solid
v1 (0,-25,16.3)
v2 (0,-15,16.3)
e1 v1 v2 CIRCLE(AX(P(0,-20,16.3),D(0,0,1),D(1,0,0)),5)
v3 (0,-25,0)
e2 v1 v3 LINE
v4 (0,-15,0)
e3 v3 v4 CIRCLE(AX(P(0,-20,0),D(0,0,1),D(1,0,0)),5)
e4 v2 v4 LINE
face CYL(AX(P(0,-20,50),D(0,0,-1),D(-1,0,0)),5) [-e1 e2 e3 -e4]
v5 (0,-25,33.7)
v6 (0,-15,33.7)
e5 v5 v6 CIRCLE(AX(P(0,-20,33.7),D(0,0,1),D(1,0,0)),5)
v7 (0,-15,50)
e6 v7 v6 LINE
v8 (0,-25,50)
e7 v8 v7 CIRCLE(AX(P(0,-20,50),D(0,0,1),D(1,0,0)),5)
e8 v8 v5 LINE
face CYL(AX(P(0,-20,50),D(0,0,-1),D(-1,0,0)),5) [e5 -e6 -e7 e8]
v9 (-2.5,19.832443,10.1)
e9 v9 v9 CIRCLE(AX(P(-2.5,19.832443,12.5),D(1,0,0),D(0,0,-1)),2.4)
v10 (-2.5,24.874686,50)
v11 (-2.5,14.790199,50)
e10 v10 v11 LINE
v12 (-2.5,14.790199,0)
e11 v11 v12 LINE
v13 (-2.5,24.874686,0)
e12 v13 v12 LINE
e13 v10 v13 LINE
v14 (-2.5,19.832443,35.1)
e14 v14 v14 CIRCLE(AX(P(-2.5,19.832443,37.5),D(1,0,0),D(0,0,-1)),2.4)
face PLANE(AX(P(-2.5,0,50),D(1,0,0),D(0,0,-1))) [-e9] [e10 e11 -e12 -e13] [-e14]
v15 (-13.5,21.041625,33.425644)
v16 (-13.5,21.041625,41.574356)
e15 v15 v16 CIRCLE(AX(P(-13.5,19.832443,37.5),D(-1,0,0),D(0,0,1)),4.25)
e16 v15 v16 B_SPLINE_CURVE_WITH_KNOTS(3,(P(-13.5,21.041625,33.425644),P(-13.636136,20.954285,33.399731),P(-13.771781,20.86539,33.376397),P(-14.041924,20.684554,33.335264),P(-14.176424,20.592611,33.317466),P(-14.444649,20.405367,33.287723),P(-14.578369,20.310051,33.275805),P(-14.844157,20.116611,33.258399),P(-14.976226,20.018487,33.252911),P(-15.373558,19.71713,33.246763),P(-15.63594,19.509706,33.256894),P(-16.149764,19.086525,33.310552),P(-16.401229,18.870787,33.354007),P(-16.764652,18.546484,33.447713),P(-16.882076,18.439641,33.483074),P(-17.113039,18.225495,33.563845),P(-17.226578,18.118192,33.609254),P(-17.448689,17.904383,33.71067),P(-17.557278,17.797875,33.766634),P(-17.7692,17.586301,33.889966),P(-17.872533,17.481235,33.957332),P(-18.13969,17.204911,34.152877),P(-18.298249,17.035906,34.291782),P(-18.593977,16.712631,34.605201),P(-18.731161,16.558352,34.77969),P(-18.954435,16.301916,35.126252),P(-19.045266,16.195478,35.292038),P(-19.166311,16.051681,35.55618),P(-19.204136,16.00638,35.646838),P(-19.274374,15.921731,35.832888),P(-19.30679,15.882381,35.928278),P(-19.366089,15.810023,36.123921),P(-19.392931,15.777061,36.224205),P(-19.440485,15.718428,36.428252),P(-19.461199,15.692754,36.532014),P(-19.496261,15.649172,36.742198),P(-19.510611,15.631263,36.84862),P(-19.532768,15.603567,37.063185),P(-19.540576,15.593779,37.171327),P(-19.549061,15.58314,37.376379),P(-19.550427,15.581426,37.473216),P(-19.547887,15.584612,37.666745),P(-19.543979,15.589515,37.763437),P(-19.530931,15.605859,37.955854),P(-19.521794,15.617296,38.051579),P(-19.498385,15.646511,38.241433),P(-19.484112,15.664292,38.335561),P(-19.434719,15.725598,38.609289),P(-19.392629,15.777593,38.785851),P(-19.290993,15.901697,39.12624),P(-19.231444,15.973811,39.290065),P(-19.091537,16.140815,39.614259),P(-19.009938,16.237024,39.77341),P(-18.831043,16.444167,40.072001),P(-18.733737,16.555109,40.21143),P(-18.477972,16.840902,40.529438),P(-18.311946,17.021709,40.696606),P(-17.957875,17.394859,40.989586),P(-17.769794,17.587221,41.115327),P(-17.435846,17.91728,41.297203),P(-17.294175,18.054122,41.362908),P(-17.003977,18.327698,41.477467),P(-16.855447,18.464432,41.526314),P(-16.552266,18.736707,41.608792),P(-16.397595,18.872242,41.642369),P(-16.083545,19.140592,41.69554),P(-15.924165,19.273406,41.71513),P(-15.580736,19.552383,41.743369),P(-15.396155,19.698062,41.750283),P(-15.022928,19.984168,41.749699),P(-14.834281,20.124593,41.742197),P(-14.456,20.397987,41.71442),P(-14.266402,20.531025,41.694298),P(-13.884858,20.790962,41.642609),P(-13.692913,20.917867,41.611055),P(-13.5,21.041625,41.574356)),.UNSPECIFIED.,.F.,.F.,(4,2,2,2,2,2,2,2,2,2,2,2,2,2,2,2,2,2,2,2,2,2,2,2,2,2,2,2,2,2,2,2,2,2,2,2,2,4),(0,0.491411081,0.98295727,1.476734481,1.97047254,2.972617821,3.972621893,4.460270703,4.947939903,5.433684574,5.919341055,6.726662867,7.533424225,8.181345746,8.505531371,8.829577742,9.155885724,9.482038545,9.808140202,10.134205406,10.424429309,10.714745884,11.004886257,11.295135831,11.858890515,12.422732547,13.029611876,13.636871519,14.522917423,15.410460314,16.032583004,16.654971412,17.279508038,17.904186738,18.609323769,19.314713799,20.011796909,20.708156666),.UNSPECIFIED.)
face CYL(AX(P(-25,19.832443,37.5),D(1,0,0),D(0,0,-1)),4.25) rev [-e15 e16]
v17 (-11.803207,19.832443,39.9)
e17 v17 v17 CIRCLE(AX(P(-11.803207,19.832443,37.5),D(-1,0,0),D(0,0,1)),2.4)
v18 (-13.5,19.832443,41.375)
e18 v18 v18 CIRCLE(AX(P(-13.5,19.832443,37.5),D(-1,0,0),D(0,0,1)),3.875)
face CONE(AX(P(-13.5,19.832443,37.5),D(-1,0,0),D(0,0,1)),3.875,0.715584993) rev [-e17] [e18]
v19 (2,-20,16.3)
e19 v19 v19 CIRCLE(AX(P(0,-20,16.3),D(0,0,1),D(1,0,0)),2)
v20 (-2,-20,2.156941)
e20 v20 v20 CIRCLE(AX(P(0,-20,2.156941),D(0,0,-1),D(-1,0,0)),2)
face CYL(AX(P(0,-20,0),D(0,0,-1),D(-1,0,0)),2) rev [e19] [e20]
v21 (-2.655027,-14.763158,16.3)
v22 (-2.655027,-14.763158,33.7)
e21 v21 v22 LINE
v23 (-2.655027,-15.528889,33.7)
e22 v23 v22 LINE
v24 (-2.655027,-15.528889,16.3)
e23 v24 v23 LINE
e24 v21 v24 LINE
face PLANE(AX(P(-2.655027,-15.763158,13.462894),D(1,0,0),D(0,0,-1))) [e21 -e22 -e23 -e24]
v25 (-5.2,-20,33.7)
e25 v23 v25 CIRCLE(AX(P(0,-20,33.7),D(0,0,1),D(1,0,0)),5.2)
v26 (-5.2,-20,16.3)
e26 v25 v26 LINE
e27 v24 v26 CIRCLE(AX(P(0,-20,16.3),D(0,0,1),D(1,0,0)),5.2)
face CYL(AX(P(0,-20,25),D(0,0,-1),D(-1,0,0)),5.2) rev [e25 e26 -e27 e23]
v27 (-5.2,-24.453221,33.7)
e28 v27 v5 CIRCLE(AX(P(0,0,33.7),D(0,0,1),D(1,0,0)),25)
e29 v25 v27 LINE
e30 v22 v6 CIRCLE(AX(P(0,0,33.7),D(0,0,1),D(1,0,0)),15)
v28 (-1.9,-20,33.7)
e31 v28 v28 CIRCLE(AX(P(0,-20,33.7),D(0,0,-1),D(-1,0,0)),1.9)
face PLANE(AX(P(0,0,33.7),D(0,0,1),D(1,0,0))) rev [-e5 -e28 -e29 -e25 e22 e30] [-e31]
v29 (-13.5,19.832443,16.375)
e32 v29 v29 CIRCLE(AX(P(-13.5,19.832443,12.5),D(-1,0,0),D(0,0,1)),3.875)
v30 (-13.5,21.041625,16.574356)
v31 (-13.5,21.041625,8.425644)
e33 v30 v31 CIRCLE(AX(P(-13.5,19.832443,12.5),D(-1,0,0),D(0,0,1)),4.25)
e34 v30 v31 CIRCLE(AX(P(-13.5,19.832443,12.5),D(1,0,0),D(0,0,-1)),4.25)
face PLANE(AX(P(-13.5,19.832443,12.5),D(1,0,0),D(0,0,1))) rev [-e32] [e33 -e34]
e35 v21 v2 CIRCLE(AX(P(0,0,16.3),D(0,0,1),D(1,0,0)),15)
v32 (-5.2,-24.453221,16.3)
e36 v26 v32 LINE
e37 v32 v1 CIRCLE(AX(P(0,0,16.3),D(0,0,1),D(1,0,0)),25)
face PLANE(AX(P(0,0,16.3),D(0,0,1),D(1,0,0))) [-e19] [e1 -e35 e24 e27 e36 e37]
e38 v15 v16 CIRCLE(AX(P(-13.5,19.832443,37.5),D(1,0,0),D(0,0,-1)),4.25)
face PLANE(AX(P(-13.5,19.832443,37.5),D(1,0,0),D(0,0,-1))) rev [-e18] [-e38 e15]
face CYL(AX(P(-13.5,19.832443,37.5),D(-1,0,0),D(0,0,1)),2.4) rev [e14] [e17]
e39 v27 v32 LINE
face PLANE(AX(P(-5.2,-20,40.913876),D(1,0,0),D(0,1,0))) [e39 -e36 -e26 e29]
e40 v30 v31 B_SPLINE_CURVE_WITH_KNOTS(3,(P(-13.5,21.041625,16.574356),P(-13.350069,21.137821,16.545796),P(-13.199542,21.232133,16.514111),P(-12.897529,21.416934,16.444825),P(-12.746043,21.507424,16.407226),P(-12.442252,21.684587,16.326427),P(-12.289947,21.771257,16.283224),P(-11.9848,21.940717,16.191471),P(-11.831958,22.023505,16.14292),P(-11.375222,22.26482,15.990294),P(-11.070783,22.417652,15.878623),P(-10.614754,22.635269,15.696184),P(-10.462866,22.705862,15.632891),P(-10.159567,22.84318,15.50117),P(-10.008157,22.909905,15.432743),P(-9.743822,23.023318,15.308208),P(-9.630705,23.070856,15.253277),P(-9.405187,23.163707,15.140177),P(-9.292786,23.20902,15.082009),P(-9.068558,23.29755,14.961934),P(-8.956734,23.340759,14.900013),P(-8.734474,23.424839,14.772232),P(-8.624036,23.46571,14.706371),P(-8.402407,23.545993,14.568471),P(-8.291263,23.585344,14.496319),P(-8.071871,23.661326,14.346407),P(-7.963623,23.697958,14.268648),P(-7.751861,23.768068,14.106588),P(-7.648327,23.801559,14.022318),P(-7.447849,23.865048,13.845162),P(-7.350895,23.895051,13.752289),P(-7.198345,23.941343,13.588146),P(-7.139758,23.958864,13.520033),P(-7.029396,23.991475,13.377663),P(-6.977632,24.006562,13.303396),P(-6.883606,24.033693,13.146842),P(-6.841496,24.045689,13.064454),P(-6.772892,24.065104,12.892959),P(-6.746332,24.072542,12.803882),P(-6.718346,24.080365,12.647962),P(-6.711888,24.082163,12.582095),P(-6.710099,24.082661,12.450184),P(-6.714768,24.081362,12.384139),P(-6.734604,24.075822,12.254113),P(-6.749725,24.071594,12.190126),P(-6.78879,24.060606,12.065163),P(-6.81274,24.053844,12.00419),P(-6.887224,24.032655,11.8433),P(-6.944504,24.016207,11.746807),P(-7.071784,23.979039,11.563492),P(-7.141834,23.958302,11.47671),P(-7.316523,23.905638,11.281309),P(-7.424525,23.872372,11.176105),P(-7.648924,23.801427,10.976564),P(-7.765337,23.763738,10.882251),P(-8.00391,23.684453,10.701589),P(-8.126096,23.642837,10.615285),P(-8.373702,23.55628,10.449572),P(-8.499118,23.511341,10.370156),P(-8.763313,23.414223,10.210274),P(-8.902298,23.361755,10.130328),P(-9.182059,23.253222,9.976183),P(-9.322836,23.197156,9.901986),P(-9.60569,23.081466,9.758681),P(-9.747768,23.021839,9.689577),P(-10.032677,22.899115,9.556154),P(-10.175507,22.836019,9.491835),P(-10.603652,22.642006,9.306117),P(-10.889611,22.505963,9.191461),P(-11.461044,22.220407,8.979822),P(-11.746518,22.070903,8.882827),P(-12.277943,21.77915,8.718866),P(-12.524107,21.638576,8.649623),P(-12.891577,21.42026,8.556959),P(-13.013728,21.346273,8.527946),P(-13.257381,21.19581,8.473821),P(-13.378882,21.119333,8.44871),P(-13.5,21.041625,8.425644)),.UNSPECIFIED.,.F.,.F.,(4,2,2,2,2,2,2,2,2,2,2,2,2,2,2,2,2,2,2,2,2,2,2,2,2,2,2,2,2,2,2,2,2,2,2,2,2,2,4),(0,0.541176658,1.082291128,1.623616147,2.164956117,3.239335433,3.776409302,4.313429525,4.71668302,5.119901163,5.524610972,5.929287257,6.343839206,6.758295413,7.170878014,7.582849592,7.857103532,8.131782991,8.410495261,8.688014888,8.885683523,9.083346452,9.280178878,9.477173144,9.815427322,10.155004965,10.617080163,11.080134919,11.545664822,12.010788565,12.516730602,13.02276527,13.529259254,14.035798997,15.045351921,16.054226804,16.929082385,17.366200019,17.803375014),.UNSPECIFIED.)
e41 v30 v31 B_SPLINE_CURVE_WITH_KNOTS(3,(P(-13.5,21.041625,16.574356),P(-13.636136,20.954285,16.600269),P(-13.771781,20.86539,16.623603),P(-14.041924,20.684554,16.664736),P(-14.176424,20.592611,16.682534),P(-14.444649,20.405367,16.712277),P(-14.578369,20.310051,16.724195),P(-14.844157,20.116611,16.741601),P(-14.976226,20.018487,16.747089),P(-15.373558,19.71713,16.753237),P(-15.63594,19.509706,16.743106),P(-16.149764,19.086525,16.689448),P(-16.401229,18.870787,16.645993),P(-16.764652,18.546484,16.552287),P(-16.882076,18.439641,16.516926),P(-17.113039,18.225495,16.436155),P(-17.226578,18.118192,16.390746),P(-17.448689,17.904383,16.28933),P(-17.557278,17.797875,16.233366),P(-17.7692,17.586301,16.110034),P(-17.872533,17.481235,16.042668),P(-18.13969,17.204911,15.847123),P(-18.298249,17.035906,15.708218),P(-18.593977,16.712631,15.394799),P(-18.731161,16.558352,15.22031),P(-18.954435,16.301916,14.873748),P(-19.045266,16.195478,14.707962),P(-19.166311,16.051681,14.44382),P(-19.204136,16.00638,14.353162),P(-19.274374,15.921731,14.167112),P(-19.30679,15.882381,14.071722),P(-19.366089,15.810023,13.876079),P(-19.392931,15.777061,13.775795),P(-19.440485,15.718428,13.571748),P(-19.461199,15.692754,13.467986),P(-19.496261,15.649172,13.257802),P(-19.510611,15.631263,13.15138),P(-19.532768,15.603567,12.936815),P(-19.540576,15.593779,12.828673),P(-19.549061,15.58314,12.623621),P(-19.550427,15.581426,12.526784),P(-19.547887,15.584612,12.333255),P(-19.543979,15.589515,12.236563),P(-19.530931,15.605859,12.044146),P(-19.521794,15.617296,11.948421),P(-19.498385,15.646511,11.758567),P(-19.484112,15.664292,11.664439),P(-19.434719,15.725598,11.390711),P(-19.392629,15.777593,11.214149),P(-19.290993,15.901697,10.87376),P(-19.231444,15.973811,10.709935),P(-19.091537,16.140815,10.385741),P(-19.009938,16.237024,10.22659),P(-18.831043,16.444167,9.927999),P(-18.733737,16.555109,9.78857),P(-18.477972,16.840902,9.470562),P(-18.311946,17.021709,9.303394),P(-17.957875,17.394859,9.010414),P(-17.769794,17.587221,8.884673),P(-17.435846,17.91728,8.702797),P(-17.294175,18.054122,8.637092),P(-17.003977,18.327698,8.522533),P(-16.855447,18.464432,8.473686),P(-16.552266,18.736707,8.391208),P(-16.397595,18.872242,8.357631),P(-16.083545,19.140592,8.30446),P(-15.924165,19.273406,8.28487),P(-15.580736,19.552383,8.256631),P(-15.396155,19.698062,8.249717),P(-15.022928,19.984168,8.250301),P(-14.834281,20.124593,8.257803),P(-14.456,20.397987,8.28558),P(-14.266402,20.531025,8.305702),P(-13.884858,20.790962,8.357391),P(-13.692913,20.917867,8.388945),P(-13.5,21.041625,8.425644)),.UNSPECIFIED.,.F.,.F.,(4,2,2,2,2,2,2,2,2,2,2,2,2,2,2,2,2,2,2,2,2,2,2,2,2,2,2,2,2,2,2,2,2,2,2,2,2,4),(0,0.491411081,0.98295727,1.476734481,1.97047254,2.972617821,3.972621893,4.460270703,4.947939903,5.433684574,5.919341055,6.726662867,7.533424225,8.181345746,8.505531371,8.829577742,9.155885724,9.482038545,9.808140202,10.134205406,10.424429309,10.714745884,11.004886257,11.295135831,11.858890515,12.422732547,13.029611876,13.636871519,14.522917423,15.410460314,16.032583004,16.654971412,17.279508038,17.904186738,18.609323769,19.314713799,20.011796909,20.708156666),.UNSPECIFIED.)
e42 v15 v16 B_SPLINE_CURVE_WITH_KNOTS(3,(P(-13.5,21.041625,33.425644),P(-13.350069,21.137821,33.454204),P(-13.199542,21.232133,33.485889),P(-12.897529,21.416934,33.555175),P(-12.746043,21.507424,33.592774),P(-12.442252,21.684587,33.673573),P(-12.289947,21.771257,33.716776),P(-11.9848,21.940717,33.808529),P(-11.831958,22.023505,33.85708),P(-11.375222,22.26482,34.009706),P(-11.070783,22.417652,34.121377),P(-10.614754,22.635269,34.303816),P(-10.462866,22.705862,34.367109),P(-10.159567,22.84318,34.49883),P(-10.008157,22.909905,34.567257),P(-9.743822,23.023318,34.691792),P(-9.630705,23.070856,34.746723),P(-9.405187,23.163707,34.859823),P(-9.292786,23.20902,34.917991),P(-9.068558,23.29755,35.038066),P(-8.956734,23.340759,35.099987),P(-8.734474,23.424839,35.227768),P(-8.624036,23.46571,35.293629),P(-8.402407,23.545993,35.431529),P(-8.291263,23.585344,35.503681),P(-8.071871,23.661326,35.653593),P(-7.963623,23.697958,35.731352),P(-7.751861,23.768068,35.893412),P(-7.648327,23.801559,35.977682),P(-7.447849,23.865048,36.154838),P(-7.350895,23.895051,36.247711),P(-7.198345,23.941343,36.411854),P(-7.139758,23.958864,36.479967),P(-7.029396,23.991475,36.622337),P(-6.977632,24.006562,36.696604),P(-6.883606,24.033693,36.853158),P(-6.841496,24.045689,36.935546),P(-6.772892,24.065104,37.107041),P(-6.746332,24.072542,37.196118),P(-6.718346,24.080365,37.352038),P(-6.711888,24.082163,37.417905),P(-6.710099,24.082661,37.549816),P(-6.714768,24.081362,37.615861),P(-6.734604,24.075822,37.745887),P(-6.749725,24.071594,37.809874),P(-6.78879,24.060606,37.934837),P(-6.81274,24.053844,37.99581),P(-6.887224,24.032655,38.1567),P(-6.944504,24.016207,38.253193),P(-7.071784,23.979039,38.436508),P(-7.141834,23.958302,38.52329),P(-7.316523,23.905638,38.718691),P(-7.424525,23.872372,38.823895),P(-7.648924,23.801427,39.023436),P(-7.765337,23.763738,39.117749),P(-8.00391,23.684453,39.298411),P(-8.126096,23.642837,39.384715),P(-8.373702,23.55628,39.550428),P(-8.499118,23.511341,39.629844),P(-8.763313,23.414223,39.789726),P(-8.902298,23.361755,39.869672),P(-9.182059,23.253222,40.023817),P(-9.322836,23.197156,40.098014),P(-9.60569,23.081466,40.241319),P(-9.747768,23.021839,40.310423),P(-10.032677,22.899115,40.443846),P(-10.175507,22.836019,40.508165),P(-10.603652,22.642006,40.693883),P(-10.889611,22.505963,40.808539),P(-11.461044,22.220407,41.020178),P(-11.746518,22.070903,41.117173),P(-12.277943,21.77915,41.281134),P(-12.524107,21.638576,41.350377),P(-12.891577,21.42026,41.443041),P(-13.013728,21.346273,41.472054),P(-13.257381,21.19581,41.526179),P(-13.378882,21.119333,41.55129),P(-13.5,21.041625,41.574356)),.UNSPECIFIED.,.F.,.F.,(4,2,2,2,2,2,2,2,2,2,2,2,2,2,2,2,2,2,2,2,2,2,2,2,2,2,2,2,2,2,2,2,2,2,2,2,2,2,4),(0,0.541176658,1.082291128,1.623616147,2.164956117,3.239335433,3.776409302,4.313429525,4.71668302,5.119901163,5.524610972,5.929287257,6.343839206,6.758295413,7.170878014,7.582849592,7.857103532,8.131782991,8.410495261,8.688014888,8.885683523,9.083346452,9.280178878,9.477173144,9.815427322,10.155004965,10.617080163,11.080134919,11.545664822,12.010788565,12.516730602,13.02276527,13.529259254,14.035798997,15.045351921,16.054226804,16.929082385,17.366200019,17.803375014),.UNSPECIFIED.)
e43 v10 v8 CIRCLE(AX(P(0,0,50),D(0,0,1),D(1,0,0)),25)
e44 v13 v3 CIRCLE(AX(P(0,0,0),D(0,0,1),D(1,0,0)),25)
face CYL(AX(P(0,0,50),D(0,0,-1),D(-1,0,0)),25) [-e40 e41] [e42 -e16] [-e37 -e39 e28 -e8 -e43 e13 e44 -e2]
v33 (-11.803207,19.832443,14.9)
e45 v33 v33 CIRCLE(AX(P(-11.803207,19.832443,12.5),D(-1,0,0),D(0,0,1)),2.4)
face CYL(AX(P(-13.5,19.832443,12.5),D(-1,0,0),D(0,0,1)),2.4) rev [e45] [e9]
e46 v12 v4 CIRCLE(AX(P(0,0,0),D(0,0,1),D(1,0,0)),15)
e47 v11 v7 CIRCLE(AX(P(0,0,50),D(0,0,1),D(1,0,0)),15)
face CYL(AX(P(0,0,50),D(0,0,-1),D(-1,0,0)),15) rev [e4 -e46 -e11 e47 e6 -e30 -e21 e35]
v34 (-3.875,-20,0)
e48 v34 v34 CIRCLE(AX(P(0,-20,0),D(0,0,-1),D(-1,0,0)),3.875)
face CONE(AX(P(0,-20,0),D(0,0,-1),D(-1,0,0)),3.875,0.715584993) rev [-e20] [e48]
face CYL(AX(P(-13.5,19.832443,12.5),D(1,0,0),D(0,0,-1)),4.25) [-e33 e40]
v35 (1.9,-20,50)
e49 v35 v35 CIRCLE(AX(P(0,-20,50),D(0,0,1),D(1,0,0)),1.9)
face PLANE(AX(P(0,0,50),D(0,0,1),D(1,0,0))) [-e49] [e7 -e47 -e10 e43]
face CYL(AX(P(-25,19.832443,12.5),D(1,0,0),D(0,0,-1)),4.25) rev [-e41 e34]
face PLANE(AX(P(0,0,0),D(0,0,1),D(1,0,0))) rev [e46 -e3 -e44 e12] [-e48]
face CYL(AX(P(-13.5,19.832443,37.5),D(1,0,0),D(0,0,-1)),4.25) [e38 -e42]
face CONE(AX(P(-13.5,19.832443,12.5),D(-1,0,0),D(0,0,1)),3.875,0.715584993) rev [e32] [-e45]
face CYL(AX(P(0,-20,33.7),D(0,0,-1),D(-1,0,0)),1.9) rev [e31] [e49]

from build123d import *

# Parameters (mm, degrees)
SKETCH1_R              = 5
SKETCH1_R_2            = 3
BOSS_EXTRUDE1_DEPTH    = 50
CUT_EXTRUDE1_START     = 16.3
CUT_EXTRUDE1_OUTLINE_R = 3
CUT_EXTRUDE1_DEPTH     = 17.4
SKETCH2_W              = 5.2
SKETCH2_H              = 5
CUT_EXTRUDE2_DEPTH     = 17.4
CUT_EXTRUDE4_DEPTH     = 17.4
SKETCH3_R              = 4.25
BOSS_EXTRUDE2_DEPTH    = 11
SKETCH6_R              = 4.25
CUT_EXTRUDE5_DEPTH     = 59.883359407
HOLE1_D                = 4.8
HOLE1_CSINK_D          = 7.75
HOLE1_CSINK_ANGLE      = 82
SKETCH9_R              = 3
BOSS_EXTRUDE3_DEPTH    = 16.3
MIRROR1_START          = 33.7
MIRROR1_OUTLINE_R      = 3
MIRROR1_DEPTH          = 16.3
HOLE2_D                = 4
HOLE2_DEPTH            = 16.3
HOLE2_CSINK_D          = 7.75
HOLE2_CSINK_ANGLE      = 82
HOLE3_D                = 3.8


# Read off the part's stored shape, not the designer's step: Cut-Extrude1, Mirror1
with BuildPart() as part:
    # Sketch1 → Boss-Extrude1 (new body)
    # profile 1 of 2: a face of its own
    with BuildSketch(Plane.XY):
        with BuildLine():
            Line((-2.5, 14.790199458), (-2.5, 24.874685928))
            ThreePointArc((-2.5, 24.874685928), (-24.968651828, -1.251569376), (0, -25))
            ThreePointArc((0, -25), (-5, -20), (0, -15))
            ThreePointArc((0, -15), (-14.947457842, -1.254393904), (-2.5, 14.790199458))
        make_face()
    # profile 2 of 2: a face of its own
    with BuildSketch(Plane.XY):
        with Locations((0, -20)):
            Circle(SKETCH1_R)
        with Locations((0, -20)):
            Circle(SKETCH1_R_2, mode=Mode.SUBTRACT)
    extrude(amount=BOSS_EXTRUDE1_DEPTH)

    # Cut-Extrude1 outline → Cut-Extrude1 (cut)
    with BuildSketch(Plane.XY.offset(CUT_EXTRUDE1_START)):
        with BuildLine():
            ThreePointArc((-1.235879849, -14.949), (-5.196630355, -19.812829077), (-1.59605733, -24.949))
            ThreePointArc((-1.59605733, -24.949), (-0.798435971, -24.987246747), (0, -25))
            ThreePointArc((0, -25), (5, -20), (0, -15))
            ThreePointArc((0, -15), (-0.618465844, -14.987244577), (-1.235879849, -14.949))
        make_face()
        with Locations((0, -20)):
            Circle(CUT_EXTRUDE1_OUTLINE_R, mode=Mode.SUBTRACT)
    extrude(amount=CUT_EXTRUDE1_DEPTH, mode=Mode.SUBTRACT)

    # Sketch2 → Cut-Extrude2 (cut)
    with BuildSketch(Plane.XY.offset(16.3)):
        with Locations((-2.6, -22.5)):
            Rectangle(SKETCH2_W, SKETCH2_H)
    extrude(amount=CUT_EXTRUDE2_DEPTH, mode=Mode.SUBTRACT)

    # Sketch4 → Cut-Extrude4 (cut)
    with BuildSketch(Plane(origin=(0, 0, 33.7), x_dir=(-1, 0, 0), z_dir=(0, 0, -1))):
        with BuildLine():
            Line((2.655027114, -15.763157895), (2.655027114, -14.763157895))
            ThreePointArc((2.655027114, -14.763157895), (1.332784975, -14.940672147), (0, -15))
            ThreePointArc((0, -15), (1.381265629, -15.194575434), (2.655027114, -15.763157895))
        make_face()
    extrude(amount=CUT_EXTRUDE4_DEPTH, mode=Mode.SUBTRACT)

    # Sketch3 → Boss-Extrude2 (add)
    with BuildSketch(Plane(origin=(-2.5, 0, 0), x_dir=(0, 0, -1), z_dir=(1, 0, 0))):
        with Locations((-37.5, 19.832442693)):
            Circle(SKETCH3_R)
    extrude(amount=-BOSS_EXTRUDE2_DEPTH)

    # Sketch6 → Cut-Extrude5 (cut, through all)
    with BuildSketch(Plane.ZY.offset(13.5)):
        with Locations((37.5, 19.832442693)):
            Circle(SKETCH6_R)
    extrude(amount=CUT_EXTRUDE5_DEPTH, mode=Mode.SUBTRACT)

    # Hole1 (through all)
    with Locations(Plane(origin=(-13.5, 19.832442693, 37.5), x_dir=(0, 0, -1), z_dir=(-1, 0, 0))):
        with Locations((0, 0)):
            CounterSinkHole(HOLE1_D / 2, HOLE1_CSINK_D / 2, counter_sink_angle=HOLE1_CSINK_ANGLE)

    # Sketch9 → Boss-Extrude3 (add)
    with BuildSketch(Plane(origin=(0, 0, 0), x_dir=(-1, 0, 0), z_dir=(0, 0, -1))):
        with Locations(Location((0, -20, 0), (0, 0, 180))):
            Circle(SKETCH9_R)
    extrude(amount=-BOSS_EXTRUDE3_DEPTH)

    # Mirror1 outline → Mirror1 (add)
    with BuildSketch(Plane.XY.offset(MIRROR1_START)):
        with Locations((0, -20)):
            Circle(MIRROR1_OUTLINE_R)
    extrude(amount=MIRROR1_DEPTH)

    # Mirror1 2 outline → Mirror1 2 (revolve)
    with BuildSketch(Plane(origin=(0, 19.832442693, 12.5), x_dir=(0, 1, 0), z_dir=(0, 0, -1))):
        Polygon((2.4, -11.803206599), (3.875, -13.5), (4.25, -13.5), (4.25, -6.708985665), (2.4, -6.708985665), align=None)
    revolve(axis=Axis((0, 19.832442693, 12.5), (1, 0, 0)))

    # Mirror1 3 outline → Mirror1 3 (revolve, cut)
    with BuildSketch(Plane(origin=(0, 19.832442693, 12.5), x_dir=(0, 1, 0), z_dir=(0, 0, -1))):
        Polygon((4.25, -13.5), (3.875, -13.5), (2.4, -11.803206599), (2.4, -2.5), (0, -2.5), (0, -19.550181267), (4.25, -19.550181267), align=None)
    revolve(axis=Axis((0, 19.832442693, 12.5), (1, 0, 0)), mode=Mode.SUBTRACT)

    # Hole2
    with Locations(Plane(origin=(0, -20, 0), x_dir=(-1, 0, 0), z_dir=(0, 0, -1))):
        with Locations((0, 0)):
            CounterSinkHole(HOLE2_D / 2, HOLE2_CSINK_D / 2, depth=HOLE2_DEPTH, counter_sink_angle=HOLE2_CSINK_ANGLE)

    # Hole3 (through all)
    with Locations(Plane(origin=(0, -20, 33.7), x_dir=(-1, 0, 0), z_dir=(0, 0, -1))):
        with Locations((0, 0)):
            Hole(HOLE3_D / 2)


solid = part.part
